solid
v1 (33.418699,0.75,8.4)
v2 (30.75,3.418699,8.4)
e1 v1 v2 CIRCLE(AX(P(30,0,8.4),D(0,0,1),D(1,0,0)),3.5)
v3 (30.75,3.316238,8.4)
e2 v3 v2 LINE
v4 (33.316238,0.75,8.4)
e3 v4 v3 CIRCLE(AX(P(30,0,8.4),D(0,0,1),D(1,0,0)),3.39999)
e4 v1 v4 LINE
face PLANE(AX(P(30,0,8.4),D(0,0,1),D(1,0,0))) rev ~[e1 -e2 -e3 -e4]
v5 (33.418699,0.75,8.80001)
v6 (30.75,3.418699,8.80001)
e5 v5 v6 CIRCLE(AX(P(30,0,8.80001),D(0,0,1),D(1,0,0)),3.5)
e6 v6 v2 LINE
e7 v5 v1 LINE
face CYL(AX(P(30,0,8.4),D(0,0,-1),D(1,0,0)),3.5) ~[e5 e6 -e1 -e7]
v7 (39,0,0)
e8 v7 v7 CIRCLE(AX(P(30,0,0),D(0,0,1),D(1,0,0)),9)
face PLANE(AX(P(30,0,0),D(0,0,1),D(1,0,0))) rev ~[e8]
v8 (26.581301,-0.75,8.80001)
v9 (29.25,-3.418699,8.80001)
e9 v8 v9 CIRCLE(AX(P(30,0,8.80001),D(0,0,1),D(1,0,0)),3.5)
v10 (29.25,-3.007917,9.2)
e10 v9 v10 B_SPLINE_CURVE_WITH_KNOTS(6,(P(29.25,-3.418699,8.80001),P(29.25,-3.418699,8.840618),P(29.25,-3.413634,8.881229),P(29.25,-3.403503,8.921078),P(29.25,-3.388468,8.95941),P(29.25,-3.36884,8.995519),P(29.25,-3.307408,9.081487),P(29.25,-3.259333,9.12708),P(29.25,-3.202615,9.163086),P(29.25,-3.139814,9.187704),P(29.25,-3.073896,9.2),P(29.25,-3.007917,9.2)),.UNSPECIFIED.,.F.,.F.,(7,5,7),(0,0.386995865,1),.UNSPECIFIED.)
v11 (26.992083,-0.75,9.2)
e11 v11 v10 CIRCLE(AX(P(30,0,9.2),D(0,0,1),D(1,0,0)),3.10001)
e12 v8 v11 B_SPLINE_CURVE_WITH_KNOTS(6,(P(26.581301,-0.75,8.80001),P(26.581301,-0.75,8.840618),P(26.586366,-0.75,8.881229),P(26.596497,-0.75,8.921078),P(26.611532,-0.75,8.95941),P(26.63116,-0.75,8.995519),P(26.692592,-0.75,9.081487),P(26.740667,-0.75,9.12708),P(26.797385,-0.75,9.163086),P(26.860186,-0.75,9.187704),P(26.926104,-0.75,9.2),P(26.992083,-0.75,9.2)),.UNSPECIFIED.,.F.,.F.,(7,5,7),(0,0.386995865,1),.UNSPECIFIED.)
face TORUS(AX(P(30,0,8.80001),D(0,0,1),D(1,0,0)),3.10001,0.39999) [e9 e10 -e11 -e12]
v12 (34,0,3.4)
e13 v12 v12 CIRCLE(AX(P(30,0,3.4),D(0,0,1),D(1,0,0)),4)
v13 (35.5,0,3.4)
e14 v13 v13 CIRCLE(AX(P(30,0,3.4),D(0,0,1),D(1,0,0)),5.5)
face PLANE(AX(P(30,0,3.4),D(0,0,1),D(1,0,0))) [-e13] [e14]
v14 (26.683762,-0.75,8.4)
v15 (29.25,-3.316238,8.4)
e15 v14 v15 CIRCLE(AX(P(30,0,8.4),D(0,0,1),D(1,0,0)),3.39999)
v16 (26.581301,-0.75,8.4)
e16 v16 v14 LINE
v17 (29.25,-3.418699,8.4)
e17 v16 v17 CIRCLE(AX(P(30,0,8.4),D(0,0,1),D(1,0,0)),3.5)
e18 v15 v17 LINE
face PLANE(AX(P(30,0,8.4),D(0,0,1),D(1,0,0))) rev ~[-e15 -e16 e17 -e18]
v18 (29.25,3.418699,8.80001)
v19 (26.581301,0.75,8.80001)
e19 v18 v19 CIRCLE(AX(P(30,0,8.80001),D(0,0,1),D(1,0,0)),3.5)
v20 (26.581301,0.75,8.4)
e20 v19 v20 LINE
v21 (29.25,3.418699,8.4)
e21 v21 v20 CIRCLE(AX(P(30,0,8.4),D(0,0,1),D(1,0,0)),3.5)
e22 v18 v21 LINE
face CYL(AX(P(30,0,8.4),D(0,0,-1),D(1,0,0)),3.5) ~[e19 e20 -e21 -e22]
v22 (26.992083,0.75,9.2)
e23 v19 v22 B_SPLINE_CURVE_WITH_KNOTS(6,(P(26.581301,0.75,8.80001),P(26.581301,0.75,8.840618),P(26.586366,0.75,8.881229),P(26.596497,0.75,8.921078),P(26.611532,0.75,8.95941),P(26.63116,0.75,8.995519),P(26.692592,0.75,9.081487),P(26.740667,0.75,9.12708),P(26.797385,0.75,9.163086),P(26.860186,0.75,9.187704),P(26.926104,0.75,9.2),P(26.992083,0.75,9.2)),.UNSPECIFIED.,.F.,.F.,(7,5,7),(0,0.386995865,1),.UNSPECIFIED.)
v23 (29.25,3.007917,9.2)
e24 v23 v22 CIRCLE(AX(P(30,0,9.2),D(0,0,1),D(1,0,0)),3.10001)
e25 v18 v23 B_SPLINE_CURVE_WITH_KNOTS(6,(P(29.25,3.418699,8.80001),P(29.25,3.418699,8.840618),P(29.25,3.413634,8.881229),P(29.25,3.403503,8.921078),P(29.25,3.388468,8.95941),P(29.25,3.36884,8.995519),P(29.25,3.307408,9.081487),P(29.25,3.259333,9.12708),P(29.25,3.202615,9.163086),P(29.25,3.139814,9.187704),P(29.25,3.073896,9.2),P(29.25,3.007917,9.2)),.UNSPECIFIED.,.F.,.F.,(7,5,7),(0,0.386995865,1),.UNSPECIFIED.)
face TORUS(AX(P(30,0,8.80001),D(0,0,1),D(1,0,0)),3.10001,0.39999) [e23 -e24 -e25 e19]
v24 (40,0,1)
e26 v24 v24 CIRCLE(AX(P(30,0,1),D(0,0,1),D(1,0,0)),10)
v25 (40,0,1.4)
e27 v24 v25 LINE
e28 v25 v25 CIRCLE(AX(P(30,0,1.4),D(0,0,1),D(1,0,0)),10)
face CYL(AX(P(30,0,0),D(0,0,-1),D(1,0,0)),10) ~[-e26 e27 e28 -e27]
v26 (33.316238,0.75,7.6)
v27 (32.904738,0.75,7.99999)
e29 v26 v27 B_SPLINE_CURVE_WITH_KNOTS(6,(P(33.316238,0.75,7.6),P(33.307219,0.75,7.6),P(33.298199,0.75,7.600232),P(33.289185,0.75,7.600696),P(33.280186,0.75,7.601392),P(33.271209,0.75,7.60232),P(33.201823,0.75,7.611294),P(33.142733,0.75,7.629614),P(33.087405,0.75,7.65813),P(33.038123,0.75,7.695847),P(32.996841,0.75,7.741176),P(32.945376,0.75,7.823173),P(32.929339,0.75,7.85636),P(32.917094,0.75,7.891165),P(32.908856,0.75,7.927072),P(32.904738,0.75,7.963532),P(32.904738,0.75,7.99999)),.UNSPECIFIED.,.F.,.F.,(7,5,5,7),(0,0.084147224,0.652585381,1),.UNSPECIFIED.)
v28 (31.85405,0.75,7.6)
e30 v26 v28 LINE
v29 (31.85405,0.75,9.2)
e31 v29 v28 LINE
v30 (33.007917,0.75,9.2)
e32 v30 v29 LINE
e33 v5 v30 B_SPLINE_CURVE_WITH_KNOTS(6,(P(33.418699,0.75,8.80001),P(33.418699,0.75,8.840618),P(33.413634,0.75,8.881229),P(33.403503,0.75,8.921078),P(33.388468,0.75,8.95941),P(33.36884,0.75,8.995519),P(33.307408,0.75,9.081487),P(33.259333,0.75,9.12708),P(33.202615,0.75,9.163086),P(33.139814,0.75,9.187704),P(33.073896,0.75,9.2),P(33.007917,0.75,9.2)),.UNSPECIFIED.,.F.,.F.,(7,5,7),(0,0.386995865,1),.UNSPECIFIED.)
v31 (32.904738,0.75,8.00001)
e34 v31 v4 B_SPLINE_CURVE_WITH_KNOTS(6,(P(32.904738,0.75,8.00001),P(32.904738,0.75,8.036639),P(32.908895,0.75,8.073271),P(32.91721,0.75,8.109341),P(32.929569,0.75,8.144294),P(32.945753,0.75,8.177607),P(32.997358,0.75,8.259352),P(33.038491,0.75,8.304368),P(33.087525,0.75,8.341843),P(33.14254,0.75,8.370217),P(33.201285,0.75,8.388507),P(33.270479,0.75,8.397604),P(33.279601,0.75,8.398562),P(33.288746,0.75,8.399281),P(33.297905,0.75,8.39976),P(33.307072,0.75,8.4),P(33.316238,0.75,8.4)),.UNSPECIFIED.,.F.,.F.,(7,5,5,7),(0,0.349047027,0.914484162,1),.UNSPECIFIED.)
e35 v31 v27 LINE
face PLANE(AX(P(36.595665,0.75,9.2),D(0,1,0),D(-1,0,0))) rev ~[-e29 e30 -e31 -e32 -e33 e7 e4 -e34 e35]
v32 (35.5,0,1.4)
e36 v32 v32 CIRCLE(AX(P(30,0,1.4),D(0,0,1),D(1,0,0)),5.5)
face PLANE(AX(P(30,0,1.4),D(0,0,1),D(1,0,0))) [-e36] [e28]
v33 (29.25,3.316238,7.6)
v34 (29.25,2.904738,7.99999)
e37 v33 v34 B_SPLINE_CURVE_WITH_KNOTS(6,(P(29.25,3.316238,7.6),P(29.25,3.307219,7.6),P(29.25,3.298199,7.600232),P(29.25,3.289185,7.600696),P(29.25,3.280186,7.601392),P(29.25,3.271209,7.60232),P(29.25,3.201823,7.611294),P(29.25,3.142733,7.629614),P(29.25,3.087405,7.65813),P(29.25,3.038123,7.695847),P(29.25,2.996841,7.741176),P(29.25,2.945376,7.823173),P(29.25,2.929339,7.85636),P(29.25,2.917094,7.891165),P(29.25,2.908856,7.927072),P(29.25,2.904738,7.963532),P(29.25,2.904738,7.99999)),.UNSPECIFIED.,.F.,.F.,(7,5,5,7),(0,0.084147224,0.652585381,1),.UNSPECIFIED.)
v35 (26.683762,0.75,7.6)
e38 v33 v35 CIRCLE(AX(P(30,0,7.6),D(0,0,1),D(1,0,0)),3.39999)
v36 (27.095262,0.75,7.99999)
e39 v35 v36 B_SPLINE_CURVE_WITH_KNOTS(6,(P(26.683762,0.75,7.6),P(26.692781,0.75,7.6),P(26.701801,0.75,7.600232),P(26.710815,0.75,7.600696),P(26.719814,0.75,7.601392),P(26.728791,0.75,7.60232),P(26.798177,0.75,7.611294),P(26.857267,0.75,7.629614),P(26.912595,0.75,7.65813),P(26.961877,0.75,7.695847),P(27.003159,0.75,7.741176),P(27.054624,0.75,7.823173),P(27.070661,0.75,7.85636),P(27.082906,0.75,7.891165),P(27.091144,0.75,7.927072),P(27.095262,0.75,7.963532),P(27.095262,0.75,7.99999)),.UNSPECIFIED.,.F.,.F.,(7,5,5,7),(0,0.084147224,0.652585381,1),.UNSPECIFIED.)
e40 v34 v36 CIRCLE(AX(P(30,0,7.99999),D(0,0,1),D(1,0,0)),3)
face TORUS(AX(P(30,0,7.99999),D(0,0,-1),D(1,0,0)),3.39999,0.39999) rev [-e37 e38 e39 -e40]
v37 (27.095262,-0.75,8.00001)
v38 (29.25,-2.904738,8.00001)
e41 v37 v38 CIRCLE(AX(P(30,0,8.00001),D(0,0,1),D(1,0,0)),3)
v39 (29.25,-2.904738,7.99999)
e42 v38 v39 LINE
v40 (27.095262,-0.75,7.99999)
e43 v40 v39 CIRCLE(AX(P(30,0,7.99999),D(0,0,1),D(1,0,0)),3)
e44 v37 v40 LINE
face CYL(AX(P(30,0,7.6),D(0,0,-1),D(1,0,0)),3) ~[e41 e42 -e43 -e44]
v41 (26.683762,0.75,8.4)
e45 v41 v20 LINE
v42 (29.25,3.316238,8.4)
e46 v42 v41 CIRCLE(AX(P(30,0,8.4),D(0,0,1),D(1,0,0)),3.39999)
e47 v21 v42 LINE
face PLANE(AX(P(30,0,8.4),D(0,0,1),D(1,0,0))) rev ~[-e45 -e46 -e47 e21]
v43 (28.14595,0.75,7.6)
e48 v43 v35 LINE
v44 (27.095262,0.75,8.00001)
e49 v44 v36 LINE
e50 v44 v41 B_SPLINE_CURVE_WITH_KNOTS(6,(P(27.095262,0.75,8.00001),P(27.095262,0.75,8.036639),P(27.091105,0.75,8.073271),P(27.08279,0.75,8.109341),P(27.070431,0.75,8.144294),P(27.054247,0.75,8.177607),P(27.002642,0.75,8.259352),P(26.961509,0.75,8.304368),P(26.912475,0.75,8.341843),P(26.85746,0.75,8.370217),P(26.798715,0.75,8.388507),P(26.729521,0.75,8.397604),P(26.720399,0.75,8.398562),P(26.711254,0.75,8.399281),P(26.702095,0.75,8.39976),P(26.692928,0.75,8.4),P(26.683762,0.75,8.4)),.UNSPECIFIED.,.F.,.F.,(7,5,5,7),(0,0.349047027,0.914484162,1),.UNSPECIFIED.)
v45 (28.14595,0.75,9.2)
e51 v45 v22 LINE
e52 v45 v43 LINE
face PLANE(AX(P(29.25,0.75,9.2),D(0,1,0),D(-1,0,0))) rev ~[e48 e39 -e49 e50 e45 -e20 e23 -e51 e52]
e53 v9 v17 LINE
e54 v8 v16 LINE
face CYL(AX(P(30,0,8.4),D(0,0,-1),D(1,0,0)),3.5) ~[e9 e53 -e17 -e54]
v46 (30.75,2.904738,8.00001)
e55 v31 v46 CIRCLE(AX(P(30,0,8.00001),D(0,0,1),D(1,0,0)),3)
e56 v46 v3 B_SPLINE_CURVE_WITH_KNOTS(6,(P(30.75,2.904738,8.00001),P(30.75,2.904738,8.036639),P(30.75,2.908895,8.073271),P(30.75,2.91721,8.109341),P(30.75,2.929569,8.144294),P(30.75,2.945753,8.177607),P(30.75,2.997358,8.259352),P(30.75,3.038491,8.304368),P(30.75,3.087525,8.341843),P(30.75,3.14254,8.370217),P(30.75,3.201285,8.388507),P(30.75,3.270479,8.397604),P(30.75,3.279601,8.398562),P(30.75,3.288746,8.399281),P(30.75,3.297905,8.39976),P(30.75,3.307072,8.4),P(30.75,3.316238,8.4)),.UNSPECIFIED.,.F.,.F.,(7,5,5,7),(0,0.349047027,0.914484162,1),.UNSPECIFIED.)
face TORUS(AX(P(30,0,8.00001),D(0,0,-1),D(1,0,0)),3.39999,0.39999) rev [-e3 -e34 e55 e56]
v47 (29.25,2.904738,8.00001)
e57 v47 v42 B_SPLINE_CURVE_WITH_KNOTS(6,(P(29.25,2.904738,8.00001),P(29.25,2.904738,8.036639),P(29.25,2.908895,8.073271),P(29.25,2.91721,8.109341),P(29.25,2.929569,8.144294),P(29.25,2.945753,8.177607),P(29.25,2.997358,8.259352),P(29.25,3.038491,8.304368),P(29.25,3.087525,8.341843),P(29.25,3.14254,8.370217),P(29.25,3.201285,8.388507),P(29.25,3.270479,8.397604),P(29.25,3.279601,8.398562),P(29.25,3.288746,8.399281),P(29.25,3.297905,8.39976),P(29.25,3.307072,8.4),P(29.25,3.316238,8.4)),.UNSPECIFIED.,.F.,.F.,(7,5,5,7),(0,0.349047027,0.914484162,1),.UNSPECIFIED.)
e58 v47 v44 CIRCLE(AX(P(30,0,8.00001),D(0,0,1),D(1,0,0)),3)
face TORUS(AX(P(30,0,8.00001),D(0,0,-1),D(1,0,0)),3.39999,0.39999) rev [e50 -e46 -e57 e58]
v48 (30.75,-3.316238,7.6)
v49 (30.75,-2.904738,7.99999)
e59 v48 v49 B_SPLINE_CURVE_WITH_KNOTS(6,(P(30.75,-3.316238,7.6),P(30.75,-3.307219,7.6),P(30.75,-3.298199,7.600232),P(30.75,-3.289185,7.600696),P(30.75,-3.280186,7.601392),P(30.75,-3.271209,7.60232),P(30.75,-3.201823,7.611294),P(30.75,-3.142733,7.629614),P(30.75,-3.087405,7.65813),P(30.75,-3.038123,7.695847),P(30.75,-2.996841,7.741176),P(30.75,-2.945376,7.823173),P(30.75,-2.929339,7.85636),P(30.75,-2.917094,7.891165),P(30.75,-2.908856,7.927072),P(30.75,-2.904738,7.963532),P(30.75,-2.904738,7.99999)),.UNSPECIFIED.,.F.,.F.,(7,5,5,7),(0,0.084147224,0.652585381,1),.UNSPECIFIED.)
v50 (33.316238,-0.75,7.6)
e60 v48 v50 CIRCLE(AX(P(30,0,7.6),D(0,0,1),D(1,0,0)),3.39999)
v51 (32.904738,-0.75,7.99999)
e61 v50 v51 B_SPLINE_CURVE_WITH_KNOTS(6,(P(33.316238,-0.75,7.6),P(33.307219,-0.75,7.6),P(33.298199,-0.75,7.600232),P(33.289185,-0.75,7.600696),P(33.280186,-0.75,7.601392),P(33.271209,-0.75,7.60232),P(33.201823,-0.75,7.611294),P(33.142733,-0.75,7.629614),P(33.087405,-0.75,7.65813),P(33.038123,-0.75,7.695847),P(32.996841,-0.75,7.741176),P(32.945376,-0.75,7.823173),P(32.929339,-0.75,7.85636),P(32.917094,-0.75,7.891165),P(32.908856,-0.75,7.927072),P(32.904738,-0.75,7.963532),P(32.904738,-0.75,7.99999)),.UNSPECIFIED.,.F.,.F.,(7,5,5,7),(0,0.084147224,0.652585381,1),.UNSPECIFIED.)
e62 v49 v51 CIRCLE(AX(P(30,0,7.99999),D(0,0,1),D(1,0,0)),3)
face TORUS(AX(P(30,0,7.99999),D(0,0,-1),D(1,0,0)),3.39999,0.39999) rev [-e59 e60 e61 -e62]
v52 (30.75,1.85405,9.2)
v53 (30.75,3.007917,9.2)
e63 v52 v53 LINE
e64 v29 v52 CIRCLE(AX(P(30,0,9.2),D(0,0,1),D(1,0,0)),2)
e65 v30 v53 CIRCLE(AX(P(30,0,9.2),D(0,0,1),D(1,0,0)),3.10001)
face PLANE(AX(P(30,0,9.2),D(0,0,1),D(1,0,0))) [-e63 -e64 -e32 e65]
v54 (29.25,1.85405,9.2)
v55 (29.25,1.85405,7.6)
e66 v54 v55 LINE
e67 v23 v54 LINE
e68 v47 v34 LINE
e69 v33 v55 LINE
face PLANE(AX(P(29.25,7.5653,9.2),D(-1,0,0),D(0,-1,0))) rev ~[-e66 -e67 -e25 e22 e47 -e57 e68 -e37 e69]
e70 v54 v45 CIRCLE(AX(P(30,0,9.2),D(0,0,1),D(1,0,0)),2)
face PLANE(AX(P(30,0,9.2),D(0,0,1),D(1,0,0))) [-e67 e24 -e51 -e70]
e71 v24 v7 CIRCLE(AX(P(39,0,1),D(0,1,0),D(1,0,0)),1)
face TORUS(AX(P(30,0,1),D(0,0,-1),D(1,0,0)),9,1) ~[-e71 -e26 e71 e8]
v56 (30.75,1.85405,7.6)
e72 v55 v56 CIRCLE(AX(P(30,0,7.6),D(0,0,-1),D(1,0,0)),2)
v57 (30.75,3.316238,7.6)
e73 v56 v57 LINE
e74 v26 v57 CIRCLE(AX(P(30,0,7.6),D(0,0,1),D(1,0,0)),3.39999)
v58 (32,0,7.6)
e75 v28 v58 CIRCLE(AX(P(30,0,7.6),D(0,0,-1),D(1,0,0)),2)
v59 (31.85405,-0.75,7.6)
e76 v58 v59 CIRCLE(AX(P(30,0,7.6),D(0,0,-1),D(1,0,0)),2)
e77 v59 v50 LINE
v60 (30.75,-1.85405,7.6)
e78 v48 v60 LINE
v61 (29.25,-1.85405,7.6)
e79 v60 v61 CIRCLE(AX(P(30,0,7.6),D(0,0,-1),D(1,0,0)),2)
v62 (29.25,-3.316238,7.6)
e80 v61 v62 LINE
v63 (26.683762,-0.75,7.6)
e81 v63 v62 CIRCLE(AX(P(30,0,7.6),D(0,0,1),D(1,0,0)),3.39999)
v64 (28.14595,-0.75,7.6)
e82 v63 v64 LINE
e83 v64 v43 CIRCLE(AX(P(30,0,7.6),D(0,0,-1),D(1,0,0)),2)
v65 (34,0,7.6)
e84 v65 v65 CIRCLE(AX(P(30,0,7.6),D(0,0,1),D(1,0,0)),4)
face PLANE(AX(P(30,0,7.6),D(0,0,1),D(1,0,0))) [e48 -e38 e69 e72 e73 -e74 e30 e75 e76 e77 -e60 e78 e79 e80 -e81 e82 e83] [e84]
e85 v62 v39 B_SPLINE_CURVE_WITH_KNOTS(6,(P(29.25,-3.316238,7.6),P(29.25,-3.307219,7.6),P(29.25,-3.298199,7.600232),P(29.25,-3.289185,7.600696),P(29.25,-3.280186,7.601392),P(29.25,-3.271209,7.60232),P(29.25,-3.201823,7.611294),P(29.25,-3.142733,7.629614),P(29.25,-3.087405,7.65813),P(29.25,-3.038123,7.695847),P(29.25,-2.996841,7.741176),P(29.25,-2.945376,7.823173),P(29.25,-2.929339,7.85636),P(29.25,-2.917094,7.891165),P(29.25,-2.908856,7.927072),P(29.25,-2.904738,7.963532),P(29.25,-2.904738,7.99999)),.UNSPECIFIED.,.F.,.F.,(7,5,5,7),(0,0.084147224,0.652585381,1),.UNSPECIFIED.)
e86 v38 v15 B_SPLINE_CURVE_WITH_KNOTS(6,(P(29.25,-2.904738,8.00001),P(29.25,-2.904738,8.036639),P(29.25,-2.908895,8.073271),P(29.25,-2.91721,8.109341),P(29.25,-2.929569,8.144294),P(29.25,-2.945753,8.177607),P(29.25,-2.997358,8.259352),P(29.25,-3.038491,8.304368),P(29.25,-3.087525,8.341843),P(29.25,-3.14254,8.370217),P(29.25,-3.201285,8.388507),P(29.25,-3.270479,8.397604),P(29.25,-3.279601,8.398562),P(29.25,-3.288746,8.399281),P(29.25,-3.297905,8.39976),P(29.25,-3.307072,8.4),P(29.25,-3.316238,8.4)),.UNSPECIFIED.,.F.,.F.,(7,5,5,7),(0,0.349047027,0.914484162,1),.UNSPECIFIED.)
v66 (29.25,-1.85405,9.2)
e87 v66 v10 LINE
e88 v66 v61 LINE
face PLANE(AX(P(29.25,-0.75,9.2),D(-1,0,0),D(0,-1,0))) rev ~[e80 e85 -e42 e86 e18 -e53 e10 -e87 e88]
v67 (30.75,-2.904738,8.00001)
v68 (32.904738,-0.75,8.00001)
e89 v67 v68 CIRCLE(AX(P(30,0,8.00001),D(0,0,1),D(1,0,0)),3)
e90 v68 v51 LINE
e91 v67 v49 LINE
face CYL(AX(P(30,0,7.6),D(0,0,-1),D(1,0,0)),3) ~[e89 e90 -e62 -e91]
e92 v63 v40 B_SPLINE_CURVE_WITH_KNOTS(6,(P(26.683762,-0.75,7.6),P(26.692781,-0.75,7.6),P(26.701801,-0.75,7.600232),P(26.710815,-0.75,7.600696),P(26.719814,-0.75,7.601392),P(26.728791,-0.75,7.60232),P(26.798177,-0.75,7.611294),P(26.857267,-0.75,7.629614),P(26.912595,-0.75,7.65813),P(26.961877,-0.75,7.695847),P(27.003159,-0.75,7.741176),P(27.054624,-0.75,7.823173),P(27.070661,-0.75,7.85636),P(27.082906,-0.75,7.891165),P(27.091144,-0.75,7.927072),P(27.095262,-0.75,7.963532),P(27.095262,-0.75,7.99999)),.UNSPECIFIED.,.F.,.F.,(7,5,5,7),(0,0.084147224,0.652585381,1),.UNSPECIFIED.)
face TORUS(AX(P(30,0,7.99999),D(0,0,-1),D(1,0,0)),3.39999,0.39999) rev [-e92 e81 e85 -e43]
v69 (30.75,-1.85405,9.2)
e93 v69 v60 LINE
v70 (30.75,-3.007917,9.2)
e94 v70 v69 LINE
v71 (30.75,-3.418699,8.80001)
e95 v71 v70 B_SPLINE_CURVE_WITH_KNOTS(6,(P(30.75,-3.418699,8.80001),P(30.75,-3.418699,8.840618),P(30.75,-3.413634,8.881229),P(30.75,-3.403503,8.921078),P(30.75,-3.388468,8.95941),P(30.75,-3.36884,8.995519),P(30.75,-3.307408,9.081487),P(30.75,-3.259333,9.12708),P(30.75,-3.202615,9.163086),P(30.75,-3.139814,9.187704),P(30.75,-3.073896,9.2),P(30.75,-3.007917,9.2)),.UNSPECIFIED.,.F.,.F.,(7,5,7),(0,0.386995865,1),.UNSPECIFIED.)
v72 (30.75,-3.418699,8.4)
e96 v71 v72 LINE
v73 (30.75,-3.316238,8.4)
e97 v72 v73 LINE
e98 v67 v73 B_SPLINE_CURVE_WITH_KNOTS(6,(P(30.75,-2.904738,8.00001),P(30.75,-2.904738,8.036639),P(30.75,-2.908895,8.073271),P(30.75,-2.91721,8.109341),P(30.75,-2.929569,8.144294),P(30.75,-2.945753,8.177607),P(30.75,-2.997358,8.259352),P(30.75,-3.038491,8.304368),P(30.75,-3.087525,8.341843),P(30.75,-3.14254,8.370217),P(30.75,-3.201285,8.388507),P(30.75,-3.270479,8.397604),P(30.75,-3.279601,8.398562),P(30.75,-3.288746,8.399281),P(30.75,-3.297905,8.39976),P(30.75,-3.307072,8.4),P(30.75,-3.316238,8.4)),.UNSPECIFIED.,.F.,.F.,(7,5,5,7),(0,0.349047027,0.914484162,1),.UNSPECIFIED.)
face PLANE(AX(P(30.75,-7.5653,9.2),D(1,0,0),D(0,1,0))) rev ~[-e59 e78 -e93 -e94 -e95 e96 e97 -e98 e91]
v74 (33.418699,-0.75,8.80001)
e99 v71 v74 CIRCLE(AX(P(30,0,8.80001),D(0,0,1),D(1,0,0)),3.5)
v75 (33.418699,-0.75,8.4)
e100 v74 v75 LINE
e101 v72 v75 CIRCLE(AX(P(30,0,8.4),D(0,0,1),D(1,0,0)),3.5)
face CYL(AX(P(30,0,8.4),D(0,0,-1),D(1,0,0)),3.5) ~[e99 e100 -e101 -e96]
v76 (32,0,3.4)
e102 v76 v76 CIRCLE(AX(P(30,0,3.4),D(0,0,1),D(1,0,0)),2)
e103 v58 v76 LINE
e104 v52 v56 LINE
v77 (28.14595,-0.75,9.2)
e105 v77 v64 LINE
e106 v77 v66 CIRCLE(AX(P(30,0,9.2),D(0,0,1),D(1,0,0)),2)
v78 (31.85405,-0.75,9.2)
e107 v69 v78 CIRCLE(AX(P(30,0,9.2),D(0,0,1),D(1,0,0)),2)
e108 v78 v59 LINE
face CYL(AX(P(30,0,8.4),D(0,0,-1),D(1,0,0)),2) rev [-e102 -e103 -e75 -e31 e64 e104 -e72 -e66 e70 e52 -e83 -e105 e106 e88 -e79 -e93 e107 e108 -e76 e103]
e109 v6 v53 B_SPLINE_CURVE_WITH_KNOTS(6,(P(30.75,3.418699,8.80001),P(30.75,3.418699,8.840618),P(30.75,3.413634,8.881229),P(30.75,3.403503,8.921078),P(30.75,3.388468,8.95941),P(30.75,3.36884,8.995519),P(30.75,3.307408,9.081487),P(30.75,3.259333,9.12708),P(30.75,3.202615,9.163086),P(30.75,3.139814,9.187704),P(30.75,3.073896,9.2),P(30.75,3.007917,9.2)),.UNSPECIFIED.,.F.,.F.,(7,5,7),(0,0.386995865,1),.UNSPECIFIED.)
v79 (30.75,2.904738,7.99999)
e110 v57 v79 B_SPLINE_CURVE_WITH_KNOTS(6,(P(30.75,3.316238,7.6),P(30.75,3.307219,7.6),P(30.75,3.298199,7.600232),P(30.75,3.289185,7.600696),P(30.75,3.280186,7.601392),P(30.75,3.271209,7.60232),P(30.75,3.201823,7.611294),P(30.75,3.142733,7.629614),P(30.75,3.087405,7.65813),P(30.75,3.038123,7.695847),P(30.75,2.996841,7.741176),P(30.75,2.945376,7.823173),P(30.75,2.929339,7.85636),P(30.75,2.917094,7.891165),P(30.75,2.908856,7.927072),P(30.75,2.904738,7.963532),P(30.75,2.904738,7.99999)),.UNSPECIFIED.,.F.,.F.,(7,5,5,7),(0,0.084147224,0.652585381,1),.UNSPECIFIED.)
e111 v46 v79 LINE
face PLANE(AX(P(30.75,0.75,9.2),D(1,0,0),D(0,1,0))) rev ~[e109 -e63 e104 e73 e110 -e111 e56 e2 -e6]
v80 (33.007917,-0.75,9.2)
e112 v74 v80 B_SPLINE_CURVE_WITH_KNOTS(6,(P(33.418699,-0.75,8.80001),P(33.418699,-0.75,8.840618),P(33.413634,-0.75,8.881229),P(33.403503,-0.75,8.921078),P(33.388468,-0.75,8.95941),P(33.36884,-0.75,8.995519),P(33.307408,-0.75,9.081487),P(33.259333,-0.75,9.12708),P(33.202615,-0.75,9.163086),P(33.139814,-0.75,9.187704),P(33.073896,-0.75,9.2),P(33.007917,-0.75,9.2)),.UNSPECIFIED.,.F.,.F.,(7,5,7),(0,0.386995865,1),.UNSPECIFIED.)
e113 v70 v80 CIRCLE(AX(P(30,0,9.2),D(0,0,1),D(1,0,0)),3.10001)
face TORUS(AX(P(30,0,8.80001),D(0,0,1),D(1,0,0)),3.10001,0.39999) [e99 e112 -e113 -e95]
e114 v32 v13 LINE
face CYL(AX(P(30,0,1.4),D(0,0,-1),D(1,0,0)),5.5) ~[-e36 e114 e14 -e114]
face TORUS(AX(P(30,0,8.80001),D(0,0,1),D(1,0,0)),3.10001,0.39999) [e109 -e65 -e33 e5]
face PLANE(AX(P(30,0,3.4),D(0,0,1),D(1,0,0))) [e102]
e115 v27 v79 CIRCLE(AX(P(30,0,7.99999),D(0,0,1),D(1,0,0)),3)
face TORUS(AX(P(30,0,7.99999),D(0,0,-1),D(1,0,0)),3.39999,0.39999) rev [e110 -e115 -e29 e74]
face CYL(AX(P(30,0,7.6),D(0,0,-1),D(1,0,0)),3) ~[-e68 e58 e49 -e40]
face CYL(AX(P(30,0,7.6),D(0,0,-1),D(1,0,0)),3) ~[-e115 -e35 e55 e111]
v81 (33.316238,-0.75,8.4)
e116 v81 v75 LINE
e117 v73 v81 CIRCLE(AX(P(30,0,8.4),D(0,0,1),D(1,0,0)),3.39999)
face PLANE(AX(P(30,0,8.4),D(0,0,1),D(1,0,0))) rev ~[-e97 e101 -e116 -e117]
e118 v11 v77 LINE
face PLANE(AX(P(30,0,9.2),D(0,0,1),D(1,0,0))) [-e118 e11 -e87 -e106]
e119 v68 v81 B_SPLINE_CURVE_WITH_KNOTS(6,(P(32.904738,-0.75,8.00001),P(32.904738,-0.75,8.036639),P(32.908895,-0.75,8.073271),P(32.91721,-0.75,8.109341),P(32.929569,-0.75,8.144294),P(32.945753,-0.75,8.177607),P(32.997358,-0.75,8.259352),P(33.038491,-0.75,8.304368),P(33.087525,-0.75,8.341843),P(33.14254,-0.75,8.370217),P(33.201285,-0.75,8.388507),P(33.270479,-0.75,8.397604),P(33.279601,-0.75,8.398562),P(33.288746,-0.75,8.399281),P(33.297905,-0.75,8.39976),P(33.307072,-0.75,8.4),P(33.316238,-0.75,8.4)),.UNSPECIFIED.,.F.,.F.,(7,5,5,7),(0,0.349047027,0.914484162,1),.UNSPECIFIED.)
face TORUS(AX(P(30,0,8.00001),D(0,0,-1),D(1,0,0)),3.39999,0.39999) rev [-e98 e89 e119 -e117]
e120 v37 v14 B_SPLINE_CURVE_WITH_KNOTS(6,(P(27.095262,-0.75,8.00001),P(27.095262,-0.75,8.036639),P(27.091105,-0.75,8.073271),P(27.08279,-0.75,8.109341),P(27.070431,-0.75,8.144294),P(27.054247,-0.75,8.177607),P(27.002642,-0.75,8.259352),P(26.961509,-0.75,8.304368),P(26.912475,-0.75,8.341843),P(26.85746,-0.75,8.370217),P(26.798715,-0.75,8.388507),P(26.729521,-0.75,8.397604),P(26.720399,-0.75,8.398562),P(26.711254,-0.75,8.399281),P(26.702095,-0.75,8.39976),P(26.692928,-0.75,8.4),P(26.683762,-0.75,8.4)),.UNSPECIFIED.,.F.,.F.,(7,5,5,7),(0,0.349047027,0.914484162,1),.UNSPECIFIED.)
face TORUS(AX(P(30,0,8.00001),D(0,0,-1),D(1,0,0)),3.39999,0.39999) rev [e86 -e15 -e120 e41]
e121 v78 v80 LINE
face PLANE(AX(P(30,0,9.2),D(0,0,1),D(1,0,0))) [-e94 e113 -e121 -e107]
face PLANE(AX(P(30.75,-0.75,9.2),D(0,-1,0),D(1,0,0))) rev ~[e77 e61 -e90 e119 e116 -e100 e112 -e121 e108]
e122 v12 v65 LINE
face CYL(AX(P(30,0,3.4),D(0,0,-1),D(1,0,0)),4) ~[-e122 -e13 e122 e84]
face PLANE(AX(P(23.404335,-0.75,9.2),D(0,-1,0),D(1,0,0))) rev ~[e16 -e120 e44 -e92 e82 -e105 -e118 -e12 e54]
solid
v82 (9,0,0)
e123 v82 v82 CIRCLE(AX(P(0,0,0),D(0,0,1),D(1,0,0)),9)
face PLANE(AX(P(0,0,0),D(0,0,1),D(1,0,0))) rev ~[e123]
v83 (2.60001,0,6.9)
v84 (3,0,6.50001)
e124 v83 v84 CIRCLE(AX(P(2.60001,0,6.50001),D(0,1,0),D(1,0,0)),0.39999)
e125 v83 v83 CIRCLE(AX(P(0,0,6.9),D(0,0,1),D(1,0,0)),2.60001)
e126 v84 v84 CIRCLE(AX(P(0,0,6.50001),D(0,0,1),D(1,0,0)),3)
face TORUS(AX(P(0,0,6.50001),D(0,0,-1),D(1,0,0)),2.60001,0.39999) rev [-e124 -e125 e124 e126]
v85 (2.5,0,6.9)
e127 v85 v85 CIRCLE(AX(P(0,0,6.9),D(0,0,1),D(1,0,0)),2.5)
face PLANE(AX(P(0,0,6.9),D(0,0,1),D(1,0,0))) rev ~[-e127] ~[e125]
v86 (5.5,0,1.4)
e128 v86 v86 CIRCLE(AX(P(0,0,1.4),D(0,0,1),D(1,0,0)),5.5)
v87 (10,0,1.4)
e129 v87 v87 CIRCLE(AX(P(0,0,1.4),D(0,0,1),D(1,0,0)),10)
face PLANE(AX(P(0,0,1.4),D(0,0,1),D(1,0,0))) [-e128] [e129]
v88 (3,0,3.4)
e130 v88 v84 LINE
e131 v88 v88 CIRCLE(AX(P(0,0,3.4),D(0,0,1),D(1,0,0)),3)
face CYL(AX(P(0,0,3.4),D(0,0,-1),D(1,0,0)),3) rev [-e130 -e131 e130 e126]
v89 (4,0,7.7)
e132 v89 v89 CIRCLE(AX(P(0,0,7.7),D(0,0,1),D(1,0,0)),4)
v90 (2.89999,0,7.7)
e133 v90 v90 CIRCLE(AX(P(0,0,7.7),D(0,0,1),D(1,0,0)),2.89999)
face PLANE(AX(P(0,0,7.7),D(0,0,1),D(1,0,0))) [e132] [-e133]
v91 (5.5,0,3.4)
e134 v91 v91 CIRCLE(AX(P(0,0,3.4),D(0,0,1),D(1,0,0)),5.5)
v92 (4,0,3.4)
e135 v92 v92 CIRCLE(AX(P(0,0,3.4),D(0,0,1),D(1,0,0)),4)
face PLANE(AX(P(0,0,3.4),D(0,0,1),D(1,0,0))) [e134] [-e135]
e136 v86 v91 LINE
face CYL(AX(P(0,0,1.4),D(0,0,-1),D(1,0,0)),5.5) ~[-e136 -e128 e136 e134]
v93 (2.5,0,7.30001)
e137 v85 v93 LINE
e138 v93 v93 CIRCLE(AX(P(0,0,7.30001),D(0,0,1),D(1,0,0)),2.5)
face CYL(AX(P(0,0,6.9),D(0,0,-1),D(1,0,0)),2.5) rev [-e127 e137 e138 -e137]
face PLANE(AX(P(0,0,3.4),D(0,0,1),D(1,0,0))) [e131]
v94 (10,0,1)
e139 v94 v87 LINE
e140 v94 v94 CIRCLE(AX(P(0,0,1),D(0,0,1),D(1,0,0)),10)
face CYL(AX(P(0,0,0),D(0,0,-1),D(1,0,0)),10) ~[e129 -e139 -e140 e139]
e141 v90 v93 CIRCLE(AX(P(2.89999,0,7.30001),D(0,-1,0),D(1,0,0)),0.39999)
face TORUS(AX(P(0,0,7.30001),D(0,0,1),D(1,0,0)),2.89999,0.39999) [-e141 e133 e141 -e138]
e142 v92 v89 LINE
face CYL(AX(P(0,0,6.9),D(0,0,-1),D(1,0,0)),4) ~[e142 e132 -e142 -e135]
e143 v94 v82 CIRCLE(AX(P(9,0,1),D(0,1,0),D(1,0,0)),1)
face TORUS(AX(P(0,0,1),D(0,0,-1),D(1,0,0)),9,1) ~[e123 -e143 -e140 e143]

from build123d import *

# Parameters (mm, degrees)
F0_R      = 10
F1_DEPTH  = 1.4
F2_R      = 5.5
F3_DEPTH  = 2
F5_R      = 4
F5_R_2    = 3
F6_DEPTH  = 3.5
F7_R      = 4
F7_R_2    = 3
F7_R_3    = 2.5
F8_DEPTH  = 0.8
F9_R      = 4
F9_R_2    = 2
F10_DEPTH = 4.2
F11_R     = 3
F11_R_2   = 2
F12_DEPTH = 0.8
F13_R     = 3.5
F13_R_2   = 3
F13_R_3   = 2
F14_DEPTH = 0.8
F15_R     = 1
F15_2_R   = 1
F16_R     = 0.39999
F16_2_R   = 0.39999
F18_DEPTH = 1.6


# Not quite as in the source:
# - a fillet or chamfer is up to 0.001 mm smaller than in the source, because OpenCascade refuses the exact size


with BuildPart() as f1:
    # F0 (on Top) → F1 (new body)
    with BuildSketch(Plane.XY):
        Circle(F0_R)
    extrude(amount=F1_DEPTH)

    # F2 (on face) → F3 (join)
    with BuildSketch(Plane.XY.offset(1.4)):
        Circle(F2_R)
    extrude(amount=F3_DEPTH)


with BuildPart() as f4_1:
    # F4: copy of F1
    add(f1.part.moved(Location((30, 0, 0))))

    # F9 (on face) → F10 (join)
    with BuildSketch(Plane.XY.offset(3.4)):
        with Locations((30, 0)):
            Circle(F9_R)
        with Locations((30, 0)):
            Circle(F9_R_2, mode=Mode.SUBTRACT)
    extrude(amount=F10_DEPTH)

    # F11 (on face) → F12 (join)
    with BuildSketch(Plane.XY.offset(7.6)):
        with Locations((30, 0)):
            Circle(F11_R)
        with Locations((30, 0)):
            Circle(F11_R_2, mode=Mode.SUBTRACT)
    extrude(amount=F12_DEPTH)

    # F13 (on face) → F14 (join)
    with BuildSketch(Plane.XY.offset(8.4)):
        with Locations((30, 0)):
            Circle(F13_R)
        with Locations((30, 0)):
            Circle(F13_R_2, mode=Mode.SUBTRACT)
        with Locations((30, 0)):
            Circle(F13_R_2)
        with Locations((30, 0)):
            Circle(F13_R_3, mode=Mode.SUBTRACT)
    extrude(amount=F14_DEPTH)

    # F15#2
    f15_2_edges = [f4_1.edges().sort_by_distance(p)[0] for p in [
        (20, 0, 0),
    ]]
    fillet(f15_2_edges, radius=F15_2_R)

    # F16 (radius 0.4 in the source; OpenCascade refuses exactly that, so slightly less here)
    f16_edges = [f4_1.edges().sort_by_distance(p)[0] for p in [
        (26.5, 0, 9.2),
        (27, 0, 8.4),
        (27, 0, 7.6),
    ]]
    fillet(f16_edges, radius=F16_R)

    # F17 (on face) → F18 (cut, through all)
    with BuildSketch(Plane.XY.offset(9.2)):
        with BuildLine():
            Line((30.75, 1.8540496218), (30.75, 3.0079165547))
            ThreePointArc((30.75, 3.0079165547), (30, 3.10001), (29.25, 3.0079165547))
            Line((29.25, 3.0079165547), (29.25, 1.8540496218))
            ThreePointArc((29.25, 1.8540496218), (30, 2), (30.75, 1.8540496218))
        make_face()
        with BuildLine():
            Line((30.75, 0.75), (30.75, 1.8540496218))
            ThreePointArc((30.75, 1.8540496218), (30, 2), (29.25, 1.8540496218))
            Line((29.25, 1.8540496218), (29.25, 0.75))
            Line((29.25, 0.75), (28.1459503782, 0.75))
            ThreePointArc((28.1459503782, 0.75), (28, 0), (28.1459503782, -0.75))
            Line((28.1459503782, -0.75), (29.25, -0.75))
            Line((29.25, -0.75), (29.25, -1.8540496218))
            ThreePointArc((29.25, -1.8540496218), (30, -2), (30.75, -1.8540496218))
            Line((30.75, -1.8540496218), (30.75, -0.75))
            Line((30.75, -0.75), (31.8540496218, -0.75))
            ThreePointArc((31.8540496218, -0.75), (31.963173355, -0.3820345249), (32, 0))
            ThreePointArc((32, 0), (31.963173355, 0.3820345249), (31.8540496218, 0.75))
            Line((31.8540496218, 0.75), (30.75, 0.75))
        make_face()
        with BuildLine():
            ThreePointArc((33.10001, 0), (33.076900502, 0.3778164907), (33.0079165547, 0.75))
            Line((33.0079165547, 0.75), (31.8540496218, 0.75))
            ThreePointArc((31.8540496218, 0.75), (31.963173355, 0.3820345249), (32, 0))
            ThreePointArc((32, 0), (31.963173355, -0.3820345249), (31.8540496218, -0.75))
            Line((31.8540496218, -0.75), (33.0079165547, -0.75))
            ThreePointArc((33.0079165547, -0.75), (33.076900502, -0.3778164907), (33.10001, 0))
        make_face()
        with BuildLine():
            Line((29.25, -1.8540496218), (29.25, -3.0079165547))
            ThreePointArc((29.25, -3.0079165547), (30, -3.10001), (30.75, -3.0079165547))
            Line((30.75, -3.0079165547), (30.75, -1.8540496218))
            ThreePointArc((30.75, -1.8540496218), (30, -2), (29.25, -1.8540496218))
        make_face()
        with BuildLine():
            Line((28.1459503782, 0.75), (26.9920834453, 0.75))
            ThreePointArc((26.9920834453, 0.75), (26.89999, 0), (26.9920834453, -0.75))
            Line((26.9920834453, -0.75), (28.1459503782, -0.75))
            ThreePointArc((28.1459503782, -0.75), (28, 0), (28.1459503782, 0.75))
        make_face()
        with BuildLine():
            Line((36.5956649214, 0.75), (33.0079165547, 0.75))
            ThreePointArc((33.0079165547, 0.75), (33.076900502, 0.3778164907), (33.10001, 0))
            ThreePointArc((33.10001, 0), (33.076900502, -0.3778164907), (33.0079165547, -0.75))
            Line((33.0079165547, -0.75), (36.5956649214, -0.75))
            Line((36.5956649214, -0.75), (36.5956649214, 0.75))
        make_face()
        with BuildLine():
            ThreePointArc((30.75, -3.0079165547), (30, -3.10001), (29.25, -3.0079165547))
            Line((29.25, -3.0079165547), (29.25, -7.5652996811))
            Line((29.25, -7.5652996811), (30.75, -7.5652996811))
            Line((30.75, -7.5652996811), (30.75, -3.0079165547))
        make_face()
        with BuildLine():
            ThreePointArc((26.9920834453, -0.75), (26.89999, 0), (26.9920834453, 0.75))
            Line((26.9920834453, 0.75), (23.4043350786, 0.75))
            Line((23.4043350786, 0.75), (23.4043350786, -0.75))
            Line((23.4043350786, -0.75), (26.9920834453, -0.75))
        make_face()
        with BuildLine():
            Line((30.75, 3.0079165547), (30.75, 7.5652996811))
            Line((30.75, 7.5652996811), (29.25, 7.5652996811))
            Line((29.25, 7.5652996811), (29.25, 3.0079165547))
            ThreePointArc((29.25, 3.0079165547), (30, 3.10001), (30.75, 3.0079165547))
        make_face()
    extrude(amount=-F18_DEPTH, mode=Mode.SUBTRACT)


with BuildPart() as f1_1:
    add(f1.part)

    # F5 (on face) → F6 (join)
    with BuildSketch(Plane.XY.offset(3.4)):
        Circle(F5_R)
        Circle(F5_R_2, mode=Mode.SUBTRACT)
    extrude(amount=F6_DEPTH)

    # F7 (on face) → F8 (join)
    with BuildSketch(Plane.XY.offset(6.9)):
        Circle(F7_R)
        Circle(F7_R_2, mode=Mode.SUBTRACT)
        Circle(F7_R_2)
        Circle(F7_R_3, mode=Mode.SUBTRACT)
    extrude(amount=F8_DEPTH)

    # F15
    f15_edges = [f1_1.edges().sort_by_distance(p)[0] for p in [
        (-10, 0, 0),
    ]]
    fillet(f15_edges, radius=F15_R)

    # F16#2 (radius 0.4 in the source; OpenCascade refuses exactly that, so slightly less here)
    f16_2_edges = [f1_1.edges().sort_by_distance(p)[0] for p in [
        (-2.5, 0, 7.7),
        (-3, 0, 6.9),
    ]]
    fillet(f16_2_edges, radius=F16_2_R)


solid = Compound([f4_1.part, f1_1.part])
